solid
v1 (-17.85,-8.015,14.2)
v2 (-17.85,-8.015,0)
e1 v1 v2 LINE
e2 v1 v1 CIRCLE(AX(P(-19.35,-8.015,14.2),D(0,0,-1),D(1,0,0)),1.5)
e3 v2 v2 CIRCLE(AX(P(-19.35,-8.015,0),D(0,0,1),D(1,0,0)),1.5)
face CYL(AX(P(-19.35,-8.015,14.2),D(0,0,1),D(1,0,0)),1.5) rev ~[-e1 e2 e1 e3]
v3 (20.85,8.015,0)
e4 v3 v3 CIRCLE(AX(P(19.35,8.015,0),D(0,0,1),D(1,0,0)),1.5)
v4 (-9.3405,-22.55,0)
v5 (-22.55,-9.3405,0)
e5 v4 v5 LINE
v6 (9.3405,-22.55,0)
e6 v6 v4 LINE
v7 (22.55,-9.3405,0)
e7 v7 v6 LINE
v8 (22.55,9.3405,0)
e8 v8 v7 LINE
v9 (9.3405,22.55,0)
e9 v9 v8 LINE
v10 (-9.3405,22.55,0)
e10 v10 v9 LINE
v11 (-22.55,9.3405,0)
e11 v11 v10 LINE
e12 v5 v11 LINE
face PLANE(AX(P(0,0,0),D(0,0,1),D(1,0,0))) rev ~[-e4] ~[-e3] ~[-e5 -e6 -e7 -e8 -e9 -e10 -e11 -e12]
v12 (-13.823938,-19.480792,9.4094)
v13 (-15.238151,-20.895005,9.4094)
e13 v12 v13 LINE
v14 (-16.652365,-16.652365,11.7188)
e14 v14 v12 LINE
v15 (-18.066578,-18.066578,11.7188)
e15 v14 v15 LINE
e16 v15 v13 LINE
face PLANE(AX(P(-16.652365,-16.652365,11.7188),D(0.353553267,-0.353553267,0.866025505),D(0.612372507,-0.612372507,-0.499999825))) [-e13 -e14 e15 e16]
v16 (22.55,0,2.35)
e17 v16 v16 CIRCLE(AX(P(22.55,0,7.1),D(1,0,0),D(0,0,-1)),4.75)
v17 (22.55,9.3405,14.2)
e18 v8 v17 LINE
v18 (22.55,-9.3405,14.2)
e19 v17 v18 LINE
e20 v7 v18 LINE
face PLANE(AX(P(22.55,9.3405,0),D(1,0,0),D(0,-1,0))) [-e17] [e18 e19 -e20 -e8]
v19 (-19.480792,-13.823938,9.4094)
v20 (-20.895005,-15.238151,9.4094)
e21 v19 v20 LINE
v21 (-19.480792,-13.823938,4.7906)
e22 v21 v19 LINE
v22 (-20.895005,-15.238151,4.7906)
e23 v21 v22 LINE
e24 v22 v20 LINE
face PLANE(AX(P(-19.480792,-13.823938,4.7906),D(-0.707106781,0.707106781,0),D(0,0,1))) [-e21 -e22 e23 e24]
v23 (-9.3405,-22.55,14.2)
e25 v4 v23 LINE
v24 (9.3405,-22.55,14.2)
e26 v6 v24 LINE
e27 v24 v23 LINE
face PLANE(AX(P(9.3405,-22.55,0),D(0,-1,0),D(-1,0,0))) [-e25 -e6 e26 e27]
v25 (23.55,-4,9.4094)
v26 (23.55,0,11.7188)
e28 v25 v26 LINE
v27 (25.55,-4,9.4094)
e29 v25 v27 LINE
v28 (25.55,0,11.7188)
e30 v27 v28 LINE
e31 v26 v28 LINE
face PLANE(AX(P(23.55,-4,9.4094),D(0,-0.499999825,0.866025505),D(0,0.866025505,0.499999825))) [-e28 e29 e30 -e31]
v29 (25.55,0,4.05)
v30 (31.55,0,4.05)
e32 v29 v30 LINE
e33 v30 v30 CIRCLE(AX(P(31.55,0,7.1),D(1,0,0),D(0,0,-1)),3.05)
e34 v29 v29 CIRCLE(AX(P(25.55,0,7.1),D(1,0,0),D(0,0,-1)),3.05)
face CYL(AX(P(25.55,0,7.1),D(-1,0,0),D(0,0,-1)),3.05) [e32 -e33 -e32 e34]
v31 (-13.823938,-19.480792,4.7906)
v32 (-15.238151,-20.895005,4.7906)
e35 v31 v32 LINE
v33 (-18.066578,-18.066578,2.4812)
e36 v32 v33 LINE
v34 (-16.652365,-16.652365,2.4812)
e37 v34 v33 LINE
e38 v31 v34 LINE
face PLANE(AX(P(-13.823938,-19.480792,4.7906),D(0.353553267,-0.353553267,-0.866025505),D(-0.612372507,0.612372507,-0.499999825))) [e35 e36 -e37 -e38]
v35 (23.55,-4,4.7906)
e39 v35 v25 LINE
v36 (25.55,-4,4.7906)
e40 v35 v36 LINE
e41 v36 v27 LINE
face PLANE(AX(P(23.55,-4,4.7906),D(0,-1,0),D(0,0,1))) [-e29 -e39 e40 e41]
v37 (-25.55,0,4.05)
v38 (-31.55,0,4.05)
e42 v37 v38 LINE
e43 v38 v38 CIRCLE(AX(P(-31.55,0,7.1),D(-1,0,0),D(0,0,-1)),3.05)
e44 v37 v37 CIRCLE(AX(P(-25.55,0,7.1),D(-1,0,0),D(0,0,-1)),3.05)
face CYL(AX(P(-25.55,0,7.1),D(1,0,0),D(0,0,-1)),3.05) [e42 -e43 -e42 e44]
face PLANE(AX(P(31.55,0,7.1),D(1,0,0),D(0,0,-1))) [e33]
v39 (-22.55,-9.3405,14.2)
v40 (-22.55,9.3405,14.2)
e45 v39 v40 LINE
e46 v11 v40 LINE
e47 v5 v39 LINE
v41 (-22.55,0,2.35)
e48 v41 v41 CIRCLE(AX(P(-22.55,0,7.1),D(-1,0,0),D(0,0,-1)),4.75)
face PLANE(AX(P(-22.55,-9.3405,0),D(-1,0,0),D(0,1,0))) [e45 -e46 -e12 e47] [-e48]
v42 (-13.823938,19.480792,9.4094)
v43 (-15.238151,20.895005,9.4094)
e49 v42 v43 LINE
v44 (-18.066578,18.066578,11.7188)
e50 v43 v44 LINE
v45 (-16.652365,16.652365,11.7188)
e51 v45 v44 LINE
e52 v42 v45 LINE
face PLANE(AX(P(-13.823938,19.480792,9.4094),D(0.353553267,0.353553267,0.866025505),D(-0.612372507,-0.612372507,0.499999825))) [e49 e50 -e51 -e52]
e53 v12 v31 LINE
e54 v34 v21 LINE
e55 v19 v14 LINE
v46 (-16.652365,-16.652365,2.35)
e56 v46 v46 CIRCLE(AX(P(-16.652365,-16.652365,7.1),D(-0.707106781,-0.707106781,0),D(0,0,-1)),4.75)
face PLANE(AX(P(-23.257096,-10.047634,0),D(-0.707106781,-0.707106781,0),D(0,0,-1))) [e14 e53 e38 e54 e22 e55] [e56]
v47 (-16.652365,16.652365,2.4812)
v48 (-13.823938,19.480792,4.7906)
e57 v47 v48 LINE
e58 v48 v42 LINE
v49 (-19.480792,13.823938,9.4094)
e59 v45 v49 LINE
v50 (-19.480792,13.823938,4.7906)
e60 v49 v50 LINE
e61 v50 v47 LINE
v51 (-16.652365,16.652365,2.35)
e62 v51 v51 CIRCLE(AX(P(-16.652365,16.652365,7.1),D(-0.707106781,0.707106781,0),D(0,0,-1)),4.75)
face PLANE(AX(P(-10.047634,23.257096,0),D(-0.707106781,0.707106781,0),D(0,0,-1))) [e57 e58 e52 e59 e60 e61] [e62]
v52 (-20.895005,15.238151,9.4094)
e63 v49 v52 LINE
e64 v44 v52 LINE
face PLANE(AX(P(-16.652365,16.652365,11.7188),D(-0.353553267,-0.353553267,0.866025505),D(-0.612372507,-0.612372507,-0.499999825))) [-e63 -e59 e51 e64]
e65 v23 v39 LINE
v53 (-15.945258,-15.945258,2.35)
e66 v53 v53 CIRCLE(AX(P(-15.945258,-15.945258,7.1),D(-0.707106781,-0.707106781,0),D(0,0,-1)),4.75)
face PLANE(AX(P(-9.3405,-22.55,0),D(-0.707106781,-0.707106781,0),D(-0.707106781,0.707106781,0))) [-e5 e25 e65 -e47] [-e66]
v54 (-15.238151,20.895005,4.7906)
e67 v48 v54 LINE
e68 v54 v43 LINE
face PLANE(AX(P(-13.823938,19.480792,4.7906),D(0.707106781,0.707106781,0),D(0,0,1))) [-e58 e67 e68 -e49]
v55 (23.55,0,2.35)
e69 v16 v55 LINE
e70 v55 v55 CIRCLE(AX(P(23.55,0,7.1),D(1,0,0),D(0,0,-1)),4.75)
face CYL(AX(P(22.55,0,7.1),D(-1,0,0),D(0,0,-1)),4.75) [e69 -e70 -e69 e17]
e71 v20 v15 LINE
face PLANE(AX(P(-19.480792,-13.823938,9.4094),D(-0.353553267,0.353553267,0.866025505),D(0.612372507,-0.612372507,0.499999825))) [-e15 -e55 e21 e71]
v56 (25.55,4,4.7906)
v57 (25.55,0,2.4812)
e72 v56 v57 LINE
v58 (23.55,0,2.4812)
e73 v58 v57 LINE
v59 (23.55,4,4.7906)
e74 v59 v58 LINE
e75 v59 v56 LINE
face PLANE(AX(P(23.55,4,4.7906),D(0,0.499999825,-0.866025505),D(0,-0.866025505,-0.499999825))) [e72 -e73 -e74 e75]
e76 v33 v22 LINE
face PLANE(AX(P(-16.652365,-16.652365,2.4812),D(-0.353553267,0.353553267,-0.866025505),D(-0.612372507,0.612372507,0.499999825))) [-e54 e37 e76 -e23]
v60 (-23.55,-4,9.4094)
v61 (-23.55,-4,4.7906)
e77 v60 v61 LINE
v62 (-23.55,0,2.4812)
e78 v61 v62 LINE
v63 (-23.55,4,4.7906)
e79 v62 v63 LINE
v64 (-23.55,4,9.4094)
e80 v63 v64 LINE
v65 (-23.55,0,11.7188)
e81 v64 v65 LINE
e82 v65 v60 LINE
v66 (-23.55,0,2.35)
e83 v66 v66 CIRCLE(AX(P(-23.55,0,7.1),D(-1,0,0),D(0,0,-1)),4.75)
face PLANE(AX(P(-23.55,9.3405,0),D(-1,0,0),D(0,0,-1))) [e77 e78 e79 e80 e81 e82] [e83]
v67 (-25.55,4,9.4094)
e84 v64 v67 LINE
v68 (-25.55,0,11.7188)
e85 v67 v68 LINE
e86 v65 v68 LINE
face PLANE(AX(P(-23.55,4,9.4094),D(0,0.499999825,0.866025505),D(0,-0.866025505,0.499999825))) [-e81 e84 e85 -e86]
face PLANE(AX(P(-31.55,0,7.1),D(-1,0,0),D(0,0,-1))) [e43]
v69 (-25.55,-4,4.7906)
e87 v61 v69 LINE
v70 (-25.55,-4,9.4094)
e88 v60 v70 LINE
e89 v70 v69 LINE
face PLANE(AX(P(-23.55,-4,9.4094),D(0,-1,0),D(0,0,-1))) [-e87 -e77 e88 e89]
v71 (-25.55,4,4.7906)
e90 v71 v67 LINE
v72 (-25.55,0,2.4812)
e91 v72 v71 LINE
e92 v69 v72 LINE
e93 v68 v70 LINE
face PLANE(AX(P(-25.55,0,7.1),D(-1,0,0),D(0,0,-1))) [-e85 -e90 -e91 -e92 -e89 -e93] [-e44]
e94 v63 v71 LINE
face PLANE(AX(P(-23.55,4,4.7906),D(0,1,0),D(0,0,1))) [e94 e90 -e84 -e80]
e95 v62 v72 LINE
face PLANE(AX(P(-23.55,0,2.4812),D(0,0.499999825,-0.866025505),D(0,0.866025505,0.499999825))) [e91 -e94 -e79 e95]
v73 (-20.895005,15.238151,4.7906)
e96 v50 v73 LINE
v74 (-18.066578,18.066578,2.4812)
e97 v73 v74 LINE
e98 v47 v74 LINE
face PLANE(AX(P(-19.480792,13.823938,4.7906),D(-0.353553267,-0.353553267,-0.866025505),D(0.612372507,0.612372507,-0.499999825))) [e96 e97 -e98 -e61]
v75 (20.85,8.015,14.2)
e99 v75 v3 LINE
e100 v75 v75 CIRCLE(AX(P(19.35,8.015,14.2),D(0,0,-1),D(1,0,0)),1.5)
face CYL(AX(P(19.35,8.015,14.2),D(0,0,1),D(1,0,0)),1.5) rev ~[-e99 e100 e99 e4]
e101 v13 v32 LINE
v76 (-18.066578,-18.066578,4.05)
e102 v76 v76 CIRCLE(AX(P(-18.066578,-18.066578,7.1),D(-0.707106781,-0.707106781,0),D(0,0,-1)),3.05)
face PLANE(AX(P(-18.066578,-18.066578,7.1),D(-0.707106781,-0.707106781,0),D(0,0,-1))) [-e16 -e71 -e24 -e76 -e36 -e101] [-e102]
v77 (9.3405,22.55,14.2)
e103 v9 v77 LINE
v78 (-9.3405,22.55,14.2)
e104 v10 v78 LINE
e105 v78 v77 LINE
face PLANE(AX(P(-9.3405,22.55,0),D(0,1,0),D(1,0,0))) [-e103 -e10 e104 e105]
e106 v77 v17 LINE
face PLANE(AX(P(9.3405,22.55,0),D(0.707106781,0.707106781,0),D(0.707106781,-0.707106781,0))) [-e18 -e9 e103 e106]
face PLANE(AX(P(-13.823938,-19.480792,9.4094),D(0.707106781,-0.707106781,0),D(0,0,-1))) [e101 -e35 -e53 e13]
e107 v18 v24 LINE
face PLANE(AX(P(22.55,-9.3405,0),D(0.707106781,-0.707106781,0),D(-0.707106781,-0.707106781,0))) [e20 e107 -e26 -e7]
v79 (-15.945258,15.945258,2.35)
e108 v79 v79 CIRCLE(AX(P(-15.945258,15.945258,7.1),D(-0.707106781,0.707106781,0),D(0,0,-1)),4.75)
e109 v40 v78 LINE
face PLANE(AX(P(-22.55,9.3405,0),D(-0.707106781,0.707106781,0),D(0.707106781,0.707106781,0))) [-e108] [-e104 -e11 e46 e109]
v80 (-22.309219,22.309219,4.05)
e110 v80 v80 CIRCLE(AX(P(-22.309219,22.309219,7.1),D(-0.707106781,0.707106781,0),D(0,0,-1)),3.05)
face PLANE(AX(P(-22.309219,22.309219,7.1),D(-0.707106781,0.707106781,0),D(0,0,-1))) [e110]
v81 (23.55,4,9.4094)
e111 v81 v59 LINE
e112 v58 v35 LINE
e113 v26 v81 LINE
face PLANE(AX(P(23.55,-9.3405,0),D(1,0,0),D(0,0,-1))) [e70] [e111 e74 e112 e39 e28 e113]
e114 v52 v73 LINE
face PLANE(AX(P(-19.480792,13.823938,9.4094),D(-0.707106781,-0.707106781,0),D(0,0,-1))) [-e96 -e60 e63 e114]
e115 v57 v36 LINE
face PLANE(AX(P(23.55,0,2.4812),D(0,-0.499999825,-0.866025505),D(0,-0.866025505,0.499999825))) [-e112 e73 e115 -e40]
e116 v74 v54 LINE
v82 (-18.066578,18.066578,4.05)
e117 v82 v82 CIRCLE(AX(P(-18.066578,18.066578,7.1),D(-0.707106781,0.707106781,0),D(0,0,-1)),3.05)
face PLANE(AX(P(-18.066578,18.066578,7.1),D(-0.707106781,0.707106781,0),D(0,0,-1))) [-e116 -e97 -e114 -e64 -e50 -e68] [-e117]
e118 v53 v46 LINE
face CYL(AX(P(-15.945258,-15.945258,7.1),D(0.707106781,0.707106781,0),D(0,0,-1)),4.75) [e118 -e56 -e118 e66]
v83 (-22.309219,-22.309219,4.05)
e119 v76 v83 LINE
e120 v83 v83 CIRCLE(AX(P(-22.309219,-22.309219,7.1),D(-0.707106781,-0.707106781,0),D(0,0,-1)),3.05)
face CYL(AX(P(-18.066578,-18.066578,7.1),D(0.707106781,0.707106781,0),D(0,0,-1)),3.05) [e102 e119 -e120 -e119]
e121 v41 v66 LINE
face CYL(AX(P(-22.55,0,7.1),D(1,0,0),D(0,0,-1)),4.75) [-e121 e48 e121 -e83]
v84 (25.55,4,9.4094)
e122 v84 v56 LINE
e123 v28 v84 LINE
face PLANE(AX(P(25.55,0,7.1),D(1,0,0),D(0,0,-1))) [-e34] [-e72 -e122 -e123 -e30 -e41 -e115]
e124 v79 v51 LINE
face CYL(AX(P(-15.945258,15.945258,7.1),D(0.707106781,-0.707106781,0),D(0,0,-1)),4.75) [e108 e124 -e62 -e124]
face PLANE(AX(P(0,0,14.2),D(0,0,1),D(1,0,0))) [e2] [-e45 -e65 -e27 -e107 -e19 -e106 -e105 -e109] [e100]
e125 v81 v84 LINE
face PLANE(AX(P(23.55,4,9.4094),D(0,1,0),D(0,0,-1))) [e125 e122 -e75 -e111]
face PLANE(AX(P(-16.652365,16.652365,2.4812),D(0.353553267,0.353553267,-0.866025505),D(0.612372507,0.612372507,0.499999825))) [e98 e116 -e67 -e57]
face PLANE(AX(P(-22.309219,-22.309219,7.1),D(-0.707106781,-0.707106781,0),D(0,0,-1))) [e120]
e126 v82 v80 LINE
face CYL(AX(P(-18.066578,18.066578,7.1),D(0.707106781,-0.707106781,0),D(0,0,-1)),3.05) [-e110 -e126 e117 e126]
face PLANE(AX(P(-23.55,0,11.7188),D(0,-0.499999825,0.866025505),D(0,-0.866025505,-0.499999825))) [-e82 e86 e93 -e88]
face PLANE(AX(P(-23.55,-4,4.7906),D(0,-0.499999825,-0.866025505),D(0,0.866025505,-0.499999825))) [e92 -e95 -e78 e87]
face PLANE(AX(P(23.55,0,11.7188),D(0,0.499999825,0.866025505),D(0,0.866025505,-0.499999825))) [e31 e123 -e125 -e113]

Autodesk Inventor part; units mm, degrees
ref_plane "YZ Plane" through (0, 0, 0) normal (1, 0, 0) x (0, 1, 0)
ref_plane "XZ Plane" through (0, 0, 0) normal (0, 1, 0) x (-1, 0, 0)
ref_plane "XY Plane" through (0, 0, 0) normal (0, 0, 1) x (1, 0, 0)
sketch "Sketch1" plane through (0, 0, 0) normal (0, 0, 1) x (1, 0, 0)
  line L0 (-22.55, 9.3405) -> (-9.3405, 22.55)
  line L1 (-9.3405, 22.55) -> (9.3405, 22.55)
  line L2 (9.3405, 22.55) -> (22.55, 9.3405)
  line L3 (22.55, 9.3405) -> (22.55, -9.3405)
  line L4 (22.55, -9.3405) -> (9.3405, -22.55)
  line L5 (9.3405, -22.55) -> (-9.3405, -22.55)
  line L6 (-9.3405, -22.55) -> (-22.55, -9.3405)
  line L7 (-22.55, -9.3405) -> (-22.55, 9.3405)
  point P0 (0, 0)
  point P1 (0, 0)
  point P2 (0, 22.55)
  dimension "d0" = 45.1
extrude "Extrusion1" add sketch "Sketch1" along normal blind 14.2
sketch "Sketch2" plane through (22.55, -9.3405, 0) normal (1, 0, 0) x (0, 0, -1)
  circle A0 centre (-7.1, 9.3405) radius 4.75
  line L0 (0, 0) -> (0, 18.681) projected
  line L1 (0, 18.681) -> (-14.2, 18.681) projected
  point P0 (0, 9.3405)
  point P1 (0, 9.3405)
  point P2 (-7.1, 18.681)
  dimension "d3" = 9.5
extrude "Extrusion2" add sketch "Sketch2" along normal blind 1
sketch "Sketch3" plane through (23.55, 0, 7.1) normal (1, 0, 0) x (0, 0, -1)
  line L0 (4.6188, 0) -> (2.3094, -4)
  line L1 (2.3094, -4) -> (-2.3094, -4)
  line L2 (-2.3094, -4) -> (-4.6188, 0)
  line L3 (-4.6188, 0) -> (-2.3094, 4)
  line L4 (-2.3094, 4) -> (2.3094, 4)
  line L5 (2.3094, 4) -> (4.6188, 0)
  line L6 (7.1, 9.3405) -> (-7.1, 9.3405) projected
  point P0 (7.1, 0)
  point P1 (0, 0)
  point P2 (0, 9.3405)
  dimension "d6" = 8
extrude "Extrusion3" add sketch "Sketch3" along normal blind 2
sketch "Sketch5" plane through (25.55, 0, 7.1) normal (1, 0, 0) x (0, 0, -1)
  circle A0 centre (0, 0) radius 3.05
  point P0 (7.1, 0)
  dimension "d9" = 6.1
extrude "Extrusion4" add sketch "Sketch5" along normal blind 6
pattern_circular "Circular Pattern1" count 2 over 135 about axis through (0, 0, -10) along (0, 0, 1) of "Extrusion2", "Extrusion3", "Extrusion4"
pattern_circular "Circular Pattern2" count 2 over 360 about axis through (0, 0, -10) along (0, 0, 1) of "Extrusion2", "Extrusion3", "Extrusion4"
pattern_circular "Circular Pattern3" count 2 over 225 about axis through (0, 0, -10) along (0, 0, 1) of "Extrusion2", "Extrusion3", "Extrusion4"
sketch "Sketch7" plane through (0, 0, 14.2) normal (0, 0, 1) x (1, 0, 0)
  circle A0 centre (19.35, 8.015) radius 1.5
  line L0 (22.55, 9.3405) -> (9.3405, 22.55) projected
  line L1 (22.55, 9.3405) -> (-22.55, -9.3405)
  circle A1 centre (-19.35, -8.015) radius 1.5
  point P0 (0, 0)
  dimension "d21" = 3
  dimension "d22" = 6.4
  dimension "d25" = 360
extrude "Extrusion5" cut sketch "Sketch7" against normal through all
properties part number "signal_combiner"
